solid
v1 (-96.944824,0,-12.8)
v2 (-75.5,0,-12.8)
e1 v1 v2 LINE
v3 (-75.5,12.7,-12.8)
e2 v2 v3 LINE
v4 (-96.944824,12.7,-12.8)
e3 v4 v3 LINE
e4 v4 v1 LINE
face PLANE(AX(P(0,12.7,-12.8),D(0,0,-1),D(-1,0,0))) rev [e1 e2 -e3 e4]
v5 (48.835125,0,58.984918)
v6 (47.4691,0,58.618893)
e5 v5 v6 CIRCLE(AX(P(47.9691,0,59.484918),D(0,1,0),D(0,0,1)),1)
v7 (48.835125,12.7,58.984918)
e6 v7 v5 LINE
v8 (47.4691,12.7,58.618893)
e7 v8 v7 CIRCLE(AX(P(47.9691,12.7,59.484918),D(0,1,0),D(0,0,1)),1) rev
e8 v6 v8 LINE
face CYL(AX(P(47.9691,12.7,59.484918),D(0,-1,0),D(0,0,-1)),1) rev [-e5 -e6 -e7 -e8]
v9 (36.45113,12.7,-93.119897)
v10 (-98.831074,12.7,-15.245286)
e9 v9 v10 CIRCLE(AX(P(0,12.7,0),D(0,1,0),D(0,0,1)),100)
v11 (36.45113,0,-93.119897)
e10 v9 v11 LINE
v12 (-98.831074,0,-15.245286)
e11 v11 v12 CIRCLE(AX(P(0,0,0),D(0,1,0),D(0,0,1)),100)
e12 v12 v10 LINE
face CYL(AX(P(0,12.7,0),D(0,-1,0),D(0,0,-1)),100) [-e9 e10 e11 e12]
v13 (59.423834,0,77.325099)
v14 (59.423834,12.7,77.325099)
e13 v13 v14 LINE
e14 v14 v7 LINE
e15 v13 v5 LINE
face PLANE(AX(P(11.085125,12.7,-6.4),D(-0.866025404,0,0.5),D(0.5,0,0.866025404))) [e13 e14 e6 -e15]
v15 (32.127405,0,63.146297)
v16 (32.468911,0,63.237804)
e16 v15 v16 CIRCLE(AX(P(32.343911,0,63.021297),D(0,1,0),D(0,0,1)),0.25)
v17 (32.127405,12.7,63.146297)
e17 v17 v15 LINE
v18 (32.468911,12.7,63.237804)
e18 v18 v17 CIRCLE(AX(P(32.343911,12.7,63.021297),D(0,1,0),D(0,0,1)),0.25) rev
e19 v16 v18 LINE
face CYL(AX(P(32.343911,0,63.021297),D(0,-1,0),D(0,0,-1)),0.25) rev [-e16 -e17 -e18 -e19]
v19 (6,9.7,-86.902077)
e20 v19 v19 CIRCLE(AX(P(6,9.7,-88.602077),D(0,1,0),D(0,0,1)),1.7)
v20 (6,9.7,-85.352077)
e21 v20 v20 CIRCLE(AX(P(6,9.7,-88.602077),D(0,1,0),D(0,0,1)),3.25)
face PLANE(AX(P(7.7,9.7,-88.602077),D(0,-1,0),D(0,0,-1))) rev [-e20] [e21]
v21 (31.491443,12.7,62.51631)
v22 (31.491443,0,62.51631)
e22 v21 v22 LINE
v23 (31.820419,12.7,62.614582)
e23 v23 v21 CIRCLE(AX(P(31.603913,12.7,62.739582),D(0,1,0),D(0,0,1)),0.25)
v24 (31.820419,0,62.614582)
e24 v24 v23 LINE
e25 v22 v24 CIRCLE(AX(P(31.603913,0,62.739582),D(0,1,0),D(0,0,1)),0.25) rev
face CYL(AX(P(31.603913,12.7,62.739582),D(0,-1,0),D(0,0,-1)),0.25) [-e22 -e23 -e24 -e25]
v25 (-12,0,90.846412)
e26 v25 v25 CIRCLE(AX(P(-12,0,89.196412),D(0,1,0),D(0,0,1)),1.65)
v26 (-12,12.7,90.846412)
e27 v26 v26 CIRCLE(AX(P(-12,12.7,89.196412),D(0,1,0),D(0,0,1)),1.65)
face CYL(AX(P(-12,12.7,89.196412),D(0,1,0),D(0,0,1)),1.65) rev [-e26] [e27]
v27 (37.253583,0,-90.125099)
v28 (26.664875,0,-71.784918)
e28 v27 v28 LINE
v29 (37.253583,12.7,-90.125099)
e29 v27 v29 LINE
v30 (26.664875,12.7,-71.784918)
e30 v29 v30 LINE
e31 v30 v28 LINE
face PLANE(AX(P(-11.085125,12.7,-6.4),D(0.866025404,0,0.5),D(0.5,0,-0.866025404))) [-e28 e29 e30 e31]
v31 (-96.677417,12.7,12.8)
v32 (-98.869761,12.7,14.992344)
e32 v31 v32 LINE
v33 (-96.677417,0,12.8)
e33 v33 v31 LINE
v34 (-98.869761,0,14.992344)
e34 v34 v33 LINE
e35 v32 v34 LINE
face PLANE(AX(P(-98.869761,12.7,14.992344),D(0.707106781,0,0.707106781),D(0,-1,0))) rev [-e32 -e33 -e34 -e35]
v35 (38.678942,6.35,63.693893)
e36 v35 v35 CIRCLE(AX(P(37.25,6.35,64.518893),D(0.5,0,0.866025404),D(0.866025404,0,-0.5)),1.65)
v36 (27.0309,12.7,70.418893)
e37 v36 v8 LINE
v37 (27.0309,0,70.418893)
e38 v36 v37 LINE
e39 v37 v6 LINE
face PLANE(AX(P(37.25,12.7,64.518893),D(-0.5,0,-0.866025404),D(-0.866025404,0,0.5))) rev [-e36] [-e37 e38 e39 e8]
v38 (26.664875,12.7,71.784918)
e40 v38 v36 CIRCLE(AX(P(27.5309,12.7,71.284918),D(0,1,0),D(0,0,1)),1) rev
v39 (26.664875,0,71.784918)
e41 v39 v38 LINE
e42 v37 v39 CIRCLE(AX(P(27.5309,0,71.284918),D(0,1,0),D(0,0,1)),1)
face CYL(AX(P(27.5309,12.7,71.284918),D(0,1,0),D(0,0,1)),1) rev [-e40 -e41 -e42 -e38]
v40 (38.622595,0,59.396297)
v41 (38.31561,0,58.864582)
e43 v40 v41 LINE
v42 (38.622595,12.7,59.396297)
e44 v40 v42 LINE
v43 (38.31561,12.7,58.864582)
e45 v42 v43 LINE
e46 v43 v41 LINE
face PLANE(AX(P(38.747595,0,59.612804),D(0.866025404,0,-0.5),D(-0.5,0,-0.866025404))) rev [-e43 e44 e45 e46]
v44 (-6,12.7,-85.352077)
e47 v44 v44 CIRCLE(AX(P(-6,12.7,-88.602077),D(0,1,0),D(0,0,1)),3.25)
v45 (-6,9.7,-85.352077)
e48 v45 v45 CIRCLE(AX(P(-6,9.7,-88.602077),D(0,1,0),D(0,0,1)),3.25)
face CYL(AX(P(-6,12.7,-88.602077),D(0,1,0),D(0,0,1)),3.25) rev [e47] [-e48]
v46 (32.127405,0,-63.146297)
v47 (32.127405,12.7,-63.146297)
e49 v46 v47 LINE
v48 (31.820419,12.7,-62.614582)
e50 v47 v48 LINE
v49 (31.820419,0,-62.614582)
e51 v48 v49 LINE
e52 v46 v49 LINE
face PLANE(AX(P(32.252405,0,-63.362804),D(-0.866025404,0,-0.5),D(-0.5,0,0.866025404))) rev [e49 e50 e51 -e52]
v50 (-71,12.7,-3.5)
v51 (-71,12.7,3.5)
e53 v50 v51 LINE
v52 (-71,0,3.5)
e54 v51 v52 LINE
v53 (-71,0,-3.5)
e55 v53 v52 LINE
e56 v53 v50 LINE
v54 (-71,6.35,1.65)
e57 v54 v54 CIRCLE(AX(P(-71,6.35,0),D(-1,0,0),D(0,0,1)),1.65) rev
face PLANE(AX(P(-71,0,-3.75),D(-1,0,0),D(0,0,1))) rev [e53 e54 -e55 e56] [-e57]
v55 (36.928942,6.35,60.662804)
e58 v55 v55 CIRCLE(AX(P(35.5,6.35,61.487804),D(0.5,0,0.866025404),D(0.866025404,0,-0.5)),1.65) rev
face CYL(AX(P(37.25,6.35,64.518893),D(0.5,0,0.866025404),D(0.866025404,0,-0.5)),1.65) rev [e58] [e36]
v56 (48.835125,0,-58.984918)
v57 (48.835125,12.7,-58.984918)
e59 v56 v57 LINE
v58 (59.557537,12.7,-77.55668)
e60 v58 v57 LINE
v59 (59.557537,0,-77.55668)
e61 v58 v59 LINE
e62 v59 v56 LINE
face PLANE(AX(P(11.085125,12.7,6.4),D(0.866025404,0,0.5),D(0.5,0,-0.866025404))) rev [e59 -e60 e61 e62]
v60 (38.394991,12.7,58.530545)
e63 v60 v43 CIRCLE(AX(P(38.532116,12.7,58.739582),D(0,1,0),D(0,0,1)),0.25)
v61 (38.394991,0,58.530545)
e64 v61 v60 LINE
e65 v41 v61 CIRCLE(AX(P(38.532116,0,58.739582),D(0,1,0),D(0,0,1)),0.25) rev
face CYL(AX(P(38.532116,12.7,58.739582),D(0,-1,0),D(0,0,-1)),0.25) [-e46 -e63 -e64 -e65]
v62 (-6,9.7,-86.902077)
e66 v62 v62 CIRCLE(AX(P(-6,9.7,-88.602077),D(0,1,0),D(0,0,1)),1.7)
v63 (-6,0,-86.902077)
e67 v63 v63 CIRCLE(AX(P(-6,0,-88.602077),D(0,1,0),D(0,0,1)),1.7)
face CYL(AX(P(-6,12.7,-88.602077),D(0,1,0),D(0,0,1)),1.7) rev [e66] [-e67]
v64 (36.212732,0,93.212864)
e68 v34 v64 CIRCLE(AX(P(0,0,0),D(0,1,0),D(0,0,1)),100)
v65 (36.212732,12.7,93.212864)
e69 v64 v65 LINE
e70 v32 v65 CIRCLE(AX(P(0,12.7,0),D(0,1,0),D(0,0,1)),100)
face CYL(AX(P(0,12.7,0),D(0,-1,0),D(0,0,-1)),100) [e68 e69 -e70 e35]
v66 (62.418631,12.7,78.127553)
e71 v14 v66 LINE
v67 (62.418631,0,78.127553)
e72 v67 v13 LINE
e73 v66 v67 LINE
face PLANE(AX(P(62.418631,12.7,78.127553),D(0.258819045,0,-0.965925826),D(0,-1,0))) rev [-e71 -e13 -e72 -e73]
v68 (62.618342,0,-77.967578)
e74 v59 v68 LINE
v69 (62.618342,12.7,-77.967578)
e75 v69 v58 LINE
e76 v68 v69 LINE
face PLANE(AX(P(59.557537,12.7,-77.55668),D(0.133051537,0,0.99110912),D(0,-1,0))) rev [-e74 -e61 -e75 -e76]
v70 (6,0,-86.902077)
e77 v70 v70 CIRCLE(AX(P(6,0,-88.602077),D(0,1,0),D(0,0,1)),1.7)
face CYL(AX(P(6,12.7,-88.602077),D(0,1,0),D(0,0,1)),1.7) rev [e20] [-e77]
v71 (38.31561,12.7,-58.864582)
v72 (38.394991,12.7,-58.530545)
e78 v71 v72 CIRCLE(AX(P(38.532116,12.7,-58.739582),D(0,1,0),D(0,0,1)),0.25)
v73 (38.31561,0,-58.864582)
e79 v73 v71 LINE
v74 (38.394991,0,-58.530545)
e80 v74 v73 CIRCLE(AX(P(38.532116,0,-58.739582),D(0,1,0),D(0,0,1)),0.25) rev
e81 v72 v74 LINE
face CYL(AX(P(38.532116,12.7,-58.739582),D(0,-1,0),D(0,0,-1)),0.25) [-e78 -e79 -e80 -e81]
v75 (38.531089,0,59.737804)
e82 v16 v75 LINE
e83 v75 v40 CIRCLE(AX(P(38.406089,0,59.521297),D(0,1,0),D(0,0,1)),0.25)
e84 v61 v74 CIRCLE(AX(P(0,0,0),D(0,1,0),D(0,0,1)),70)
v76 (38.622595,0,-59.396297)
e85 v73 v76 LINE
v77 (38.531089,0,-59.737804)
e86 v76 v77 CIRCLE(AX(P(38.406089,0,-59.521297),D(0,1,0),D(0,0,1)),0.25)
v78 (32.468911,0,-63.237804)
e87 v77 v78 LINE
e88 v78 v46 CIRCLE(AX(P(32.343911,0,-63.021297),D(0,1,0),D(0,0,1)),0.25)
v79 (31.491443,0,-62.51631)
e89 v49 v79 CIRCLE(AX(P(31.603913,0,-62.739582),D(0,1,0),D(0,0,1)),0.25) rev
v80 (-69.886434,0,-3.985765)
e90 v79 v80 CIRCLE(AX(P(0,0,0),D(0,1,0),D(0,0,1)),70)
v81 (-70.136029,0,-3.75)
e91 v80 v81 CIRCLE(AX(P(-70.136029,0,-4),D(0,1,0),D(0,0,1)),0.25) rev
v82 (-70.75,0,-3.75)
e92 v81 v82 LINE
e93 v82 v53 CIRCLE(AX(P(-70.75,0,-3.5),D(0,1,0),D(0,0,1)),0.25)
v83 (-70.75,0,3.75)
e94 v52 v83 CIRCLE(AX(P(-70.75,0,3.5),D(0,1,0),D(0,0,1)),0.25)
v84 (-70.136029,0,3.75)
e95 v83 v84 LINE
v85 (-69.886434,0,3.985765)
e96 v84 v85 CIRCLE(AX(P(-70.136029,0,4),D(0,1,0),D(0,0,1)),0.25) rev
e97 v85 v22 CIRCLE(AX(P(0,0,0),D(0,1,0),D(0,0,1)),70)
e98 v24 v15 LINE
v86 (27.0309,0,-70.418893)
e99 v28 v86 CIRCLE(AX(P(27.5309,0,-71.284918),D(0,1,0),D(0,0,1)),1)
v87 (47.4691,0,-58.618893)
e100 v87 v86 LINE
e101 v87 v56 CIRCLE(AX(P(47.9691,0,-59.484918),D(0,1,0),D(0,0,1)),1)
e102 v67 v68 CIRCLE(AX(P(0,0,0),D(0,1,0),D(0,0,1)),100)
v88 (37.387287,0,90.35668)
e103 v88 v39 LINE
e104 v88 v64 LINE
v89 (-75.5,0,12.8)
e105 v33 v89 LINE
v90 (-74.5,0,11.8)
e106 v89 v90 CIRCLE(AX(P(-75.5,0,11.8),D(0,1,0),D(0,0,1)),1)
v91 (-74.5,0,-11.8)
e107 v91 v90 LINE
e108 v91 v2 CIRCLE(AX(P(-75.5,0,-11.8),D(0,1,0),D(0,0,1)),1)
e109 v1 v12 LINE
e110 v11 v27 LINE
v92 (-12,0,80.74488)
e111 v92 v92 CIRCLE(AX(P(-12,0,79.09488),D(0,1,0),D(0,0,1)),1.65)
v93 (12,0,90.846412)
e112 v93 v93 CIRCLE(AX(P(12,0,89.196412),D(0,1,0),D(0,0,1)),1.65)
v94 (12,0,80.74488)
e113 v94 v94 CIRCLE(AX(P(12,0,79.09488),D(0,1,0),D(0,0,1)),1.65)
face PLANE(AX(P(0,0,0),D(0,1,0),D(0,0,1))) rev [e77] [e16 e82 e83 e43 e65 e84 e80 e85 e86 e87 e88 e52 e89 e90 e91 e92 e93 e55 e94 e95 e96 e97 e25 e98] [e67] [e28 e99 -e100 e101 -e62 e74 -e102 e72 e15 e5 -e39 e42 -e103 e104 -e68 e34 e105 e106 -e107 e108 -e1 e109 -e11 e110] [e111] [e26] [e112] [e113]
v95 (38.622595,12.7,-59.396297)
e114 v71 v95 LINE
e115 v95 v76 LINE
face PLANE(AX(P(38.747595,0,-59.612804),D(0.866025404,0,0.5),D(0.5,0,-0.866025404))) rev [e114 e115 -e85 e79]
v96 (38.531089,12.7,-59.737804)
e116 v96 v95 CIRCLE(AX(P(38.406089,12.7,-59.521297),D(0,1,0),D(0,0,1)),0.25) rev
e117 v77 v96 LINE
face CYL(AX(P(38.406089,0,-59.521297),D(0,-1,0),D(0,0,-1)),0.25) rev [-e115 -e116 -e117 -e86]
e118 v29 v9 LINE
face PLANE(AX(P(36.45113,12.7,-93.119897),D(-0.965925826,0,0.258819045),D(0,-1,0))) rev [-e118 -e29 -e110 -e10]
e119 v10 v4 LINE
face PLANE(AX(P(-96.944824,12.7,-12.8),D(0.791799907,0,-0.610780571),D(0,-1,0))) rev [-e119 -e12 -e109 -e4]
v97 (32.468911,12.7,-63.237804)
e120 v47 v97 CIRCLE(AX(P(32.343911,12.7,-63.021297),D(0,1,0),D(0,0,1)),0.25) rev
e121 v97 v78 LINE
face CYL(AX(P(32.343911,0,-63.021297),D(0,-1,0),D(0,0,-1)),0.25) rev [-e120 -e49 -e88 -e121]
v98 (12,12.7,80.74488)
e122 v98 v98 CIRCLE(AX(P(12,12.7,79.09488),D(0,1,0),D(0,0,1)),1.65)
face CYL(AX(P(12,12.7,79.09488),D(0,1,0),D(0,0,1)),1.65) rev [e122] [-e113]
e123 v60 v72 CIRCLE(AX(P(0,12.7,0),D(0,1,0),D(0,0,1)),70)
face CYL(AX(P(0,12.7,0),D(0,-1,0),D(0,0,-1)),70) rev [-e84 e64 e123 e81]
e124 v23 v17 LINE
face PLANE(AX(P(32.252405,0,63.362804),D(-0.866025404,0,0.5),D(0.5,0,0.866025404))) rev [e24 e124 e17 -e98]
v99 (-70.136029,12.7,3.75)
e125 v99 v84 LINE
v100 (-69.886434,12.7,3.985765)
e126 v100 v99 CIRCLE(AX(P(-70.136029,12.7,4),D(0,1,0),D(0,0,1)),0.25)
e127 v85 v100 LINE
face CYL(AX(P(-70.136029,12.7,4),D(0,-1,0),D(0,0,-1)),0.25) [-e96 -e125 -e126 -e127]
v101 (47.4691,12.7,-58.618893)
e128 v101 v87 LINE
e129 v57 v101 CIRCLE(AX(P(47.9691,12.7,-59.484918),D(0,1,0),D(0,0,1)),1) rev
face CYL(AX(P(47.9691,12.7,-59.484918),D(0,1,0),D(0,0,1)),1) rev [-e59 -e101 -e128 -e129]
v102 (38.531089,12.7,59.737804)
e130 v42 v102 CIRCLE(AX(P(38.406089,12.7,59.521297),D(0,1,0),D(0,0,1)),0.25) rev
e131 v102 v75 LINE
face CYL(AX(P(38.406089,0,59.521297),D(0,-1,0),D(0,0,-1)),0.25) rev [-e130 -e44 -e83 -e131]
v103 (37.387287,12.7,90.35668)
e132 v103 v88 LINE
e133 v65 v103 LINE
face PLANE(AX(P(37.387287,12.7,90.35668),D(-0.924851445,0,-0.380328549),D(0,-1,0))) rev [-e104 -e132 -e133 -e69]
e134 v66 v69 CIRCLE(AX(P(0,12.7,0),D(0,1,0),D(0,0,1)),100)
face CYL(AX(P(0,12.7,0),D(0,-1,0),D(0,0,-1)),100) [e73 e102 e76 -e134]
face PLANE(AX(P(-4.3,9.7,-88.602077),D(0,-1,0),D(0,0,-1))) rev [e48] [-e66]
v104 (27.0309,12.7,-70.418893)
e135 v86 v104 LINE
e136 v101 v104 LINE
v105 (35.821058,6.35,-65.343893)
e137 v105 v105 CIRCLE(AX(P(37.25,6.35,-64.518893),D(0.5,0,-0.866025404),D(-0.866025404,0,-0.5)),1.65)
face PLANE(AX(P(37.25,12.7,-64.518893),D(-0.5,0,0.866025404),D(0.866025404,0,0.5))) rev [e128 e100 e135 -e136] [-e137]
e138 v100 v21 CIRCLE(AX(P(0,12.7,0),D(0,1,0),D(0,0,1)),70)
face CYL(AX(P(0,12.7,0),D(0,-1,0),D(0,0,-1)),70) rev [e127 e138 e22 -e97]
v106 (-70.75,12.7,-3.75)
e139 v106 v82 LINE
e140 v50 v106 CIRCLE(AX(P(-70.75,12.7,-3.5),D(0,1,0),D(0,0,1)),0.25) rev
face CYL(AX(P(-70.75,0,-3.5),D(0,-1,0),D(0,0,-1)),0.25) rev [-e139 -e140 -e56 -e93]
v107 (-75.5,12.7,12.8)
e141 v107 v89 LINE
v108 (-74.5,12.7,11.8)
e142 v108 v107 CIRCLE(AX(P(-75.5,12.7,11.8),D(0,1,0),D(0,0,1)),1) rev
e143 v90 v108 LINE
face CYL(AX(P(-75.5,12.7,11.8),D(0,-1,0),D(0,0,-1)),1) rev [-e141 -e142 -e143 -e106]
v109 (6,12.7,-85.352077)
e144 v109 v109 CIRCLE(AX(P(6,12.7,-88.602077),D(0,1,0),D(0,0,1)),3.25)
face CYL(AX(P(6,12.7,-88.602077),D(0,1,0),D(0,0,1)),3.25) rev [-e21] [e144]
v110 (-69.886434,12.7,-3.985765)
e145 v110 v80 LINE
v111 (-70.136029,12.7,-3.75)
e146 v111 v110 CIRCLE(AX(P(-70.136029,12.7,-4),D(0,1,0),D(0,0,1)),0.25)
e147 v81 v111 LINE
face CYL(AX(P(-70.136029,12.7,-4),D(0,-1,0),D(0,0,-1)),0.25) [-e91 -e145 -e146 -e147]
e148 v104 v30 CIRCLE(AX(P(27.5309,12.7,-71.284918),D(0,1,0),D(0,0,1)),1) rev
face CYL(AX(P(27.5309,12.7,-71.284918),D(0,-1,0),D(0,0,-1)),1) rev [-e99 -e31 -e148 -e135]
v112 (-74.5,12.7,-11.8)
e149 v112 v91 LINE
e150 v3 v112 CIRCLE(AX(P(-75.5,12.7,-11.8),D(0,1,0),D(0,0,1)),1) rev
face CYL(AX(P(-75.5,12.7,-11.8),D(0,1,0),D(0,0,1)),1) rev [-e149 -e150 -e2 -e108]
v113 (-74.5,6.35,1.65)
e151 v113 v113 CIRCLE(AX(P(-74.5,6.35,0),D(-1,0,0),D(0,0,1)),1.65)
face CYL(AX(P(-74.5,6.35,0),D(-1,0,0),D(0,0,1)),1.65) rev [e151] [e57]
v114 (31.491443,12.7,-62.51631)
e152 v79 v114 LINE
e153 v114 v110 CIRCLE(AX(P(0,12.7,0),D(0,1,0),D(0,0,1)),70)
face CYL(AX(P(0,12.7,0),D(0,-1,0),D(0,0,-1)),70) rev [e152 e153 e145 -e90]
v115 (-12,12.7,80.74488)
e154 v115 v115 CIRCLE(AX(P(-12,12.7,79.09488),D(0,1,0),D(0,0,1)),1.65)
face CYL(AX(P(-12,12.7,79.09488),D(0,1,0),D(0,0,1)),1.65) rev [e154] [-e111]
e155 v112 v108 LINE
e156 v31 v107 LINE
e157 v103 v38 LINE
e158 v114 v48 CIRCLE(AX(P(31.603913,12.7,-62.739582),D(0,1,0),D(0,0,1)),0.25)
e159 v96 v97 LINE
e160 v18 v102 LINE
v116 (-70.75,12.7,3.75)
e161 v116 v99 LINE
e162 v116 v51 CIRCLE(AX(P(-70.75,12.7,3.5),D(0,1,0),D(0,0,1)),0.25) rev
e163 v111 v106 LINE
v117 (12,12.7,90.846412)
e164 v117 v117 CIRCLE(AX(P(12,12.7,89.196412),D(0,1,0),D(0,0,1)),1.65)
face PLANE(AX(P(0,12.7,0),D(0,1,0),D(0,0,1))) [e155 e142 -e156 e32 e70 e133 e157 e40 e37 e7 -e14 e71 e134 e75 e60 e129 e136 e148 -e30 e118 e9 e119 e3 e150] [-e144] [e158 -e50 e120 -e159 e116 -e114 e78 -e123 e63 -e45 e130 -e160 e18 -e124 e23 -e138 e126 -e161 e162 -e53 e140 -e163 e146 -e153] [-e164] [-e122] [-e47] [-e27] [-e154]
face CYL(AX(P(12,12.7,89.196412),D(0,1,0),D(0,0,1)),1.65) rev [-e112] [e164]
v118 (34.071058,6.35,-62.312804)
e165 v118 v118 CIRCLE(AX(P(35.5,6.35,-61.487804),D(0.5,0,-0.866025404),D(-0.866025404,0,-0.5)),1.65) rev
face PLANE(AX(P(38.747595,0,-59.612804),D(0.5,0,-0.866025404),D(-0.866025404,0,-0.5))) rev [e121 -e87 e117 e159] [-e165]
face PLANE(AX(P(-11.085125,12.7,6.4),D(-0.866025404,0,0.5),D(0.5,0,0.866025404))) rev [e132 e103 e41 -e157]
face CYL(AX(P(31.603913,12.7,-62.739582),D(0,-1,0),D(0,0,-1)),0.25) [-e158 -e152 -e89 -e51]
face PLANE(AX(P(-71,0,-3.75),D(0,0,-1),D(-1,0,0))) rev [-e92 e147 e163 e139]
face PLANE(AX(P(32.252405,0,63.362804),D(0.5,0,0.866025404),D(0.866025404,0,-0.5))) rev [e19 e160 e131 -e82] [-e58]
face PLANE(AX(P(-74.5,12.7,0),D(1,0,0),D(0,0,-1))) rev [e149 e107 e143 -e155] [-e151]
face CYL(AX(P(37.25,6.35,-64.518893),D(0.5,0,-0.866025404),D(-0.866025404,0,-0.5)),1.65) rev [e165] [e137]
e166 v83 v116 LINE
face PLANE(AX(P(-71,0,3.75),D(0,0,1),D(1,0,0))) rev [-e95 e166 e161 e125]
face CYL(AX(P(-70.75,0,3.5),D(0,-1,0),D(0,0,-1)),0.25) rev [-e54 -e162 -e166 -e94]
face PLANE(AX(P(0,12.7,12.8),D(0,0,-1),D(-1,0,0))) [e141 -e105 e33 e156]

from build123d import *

# Parameters (mm, degrees)
SKETCH1_R                      = 70
BOSS_EXTRUDE2_DEPTH            = 12.7
FILLET1_R                      = 1
CHAMFER1_SIZE                  = 2.232593028
CHAMFER1_SIZE_2                = 2.5
F_3_0MM_DOWEL_HOLE2_REACH      = 215.907
F_3_0MM_DOWEL_HOLE2_BORE_R     = 1.65
CIRPATTERN3_COUNT              = 3
SKETCH8_W                      = 2
SKETCH8_H                      = 7.5
CUT_EXTRUDE1_DEPTH             = 142.990457435
FILLET2_R                      = 0.25
CIRPATTERN4_COUNT              = 3
FILLET2_OF_CIRPATTERN4_R       = 0.25
CBORE_FOR_M3_SHCS1_D           = 3.4
CBORE_FOR_M3_SHCS1_DEPTH       = 25.25
CBORE_FOR_M3_SHCS1_CBORE_D     = 6.5
CBORE_FOR_M3_SHCS1_CBORE_DEPTH = 3
CBORE_FOR_M3_SHCS1_TIP         = 1.021463052
F_3_0MM_DOWEL_HOLE3_D          = 3.3
F_3_0MM_DOWEL_HOLE3_DEPTH      = 45
F_3_0MM_DOWEL_HOLE3_TIP        = 0.991420021


with BuildPart() as part:
    # Sketch1 → Boss-Extrude2 (new body)
    with BuildSketch(Plane(origin=(0, 0, 0), x_dir=(1, 0, 0), z_dir=(0, 1, 0))):
        with BuildLine():
            ThreePointArc((100, 0), (89.630863423, 44.343075243), (60.673833561, 79.490162417))
            Line((60.673833561, 79.490162417), (48.335125168, 58.118892582))
            Line((48.335125168, 58.118892582), (26.164874832, 70.918892582))
            Line((26.164874832, 70.918892582), (38.503583224, 92.290162417))
            ThreePointArc((38.503583224, 92.290162417), (-50, 86.602540378), (-99.177416784, 12.8))
            Line((-99.177416784, 12.8), (-74.5, 12.8))
            Line((-74.5, 12.8), (-74.5, -12.8))
            Line((-74.5, -12.8), (-99.177416784, -12.8))
            ThreePointArc((-99.177416784, -12.8), (-50, -86.602540378), (38.503583224, -92.290162417))
            Line((38.503583224, -92.290162417), (26.164874832, -70.918892582))
            Line((26.164874832, -70.918892582), (48.335125168, -58.118892582))
            Line((48.335125168, -58.118892582), (60.673833561, -79.490162417))
            ThreePointArc((60.673833561, -79.490162417), (89.630863423, -44.343075243), (100, 0))
        make_face()
        with Locations(Location((0, 0, 0), (0, 0, 270))):
            Circle(SKETCH1_R, mode=Mode.SUBTRACT)
    extrude(amount=BOSS_EXTRUDE2_DEPTH)

    # Fillet1
    fillet1_edges = [part.edges().sort_by_distance(p)[0] for p in [
        (48.335125168, 6.35, 58.118892582),
        (26.164874832, 6.35, 70.918892582),
        (-74.5, 6.35, 12.8),
        (-74.5, 6.35, -12.8),
        (26.164874832, 6.35, -70.918892582),
        (48.335125168, 6.35, -58.118892582),
    ]]
    fillet(fillet1_edges, radius=FILLET1_R)

    # Chamfer1
    # the kernel refuses this chamfer: 2.5, 2.232593028 mm, written as the material it takes off along each edge
    with BuildSketch(Plane(origin=(38.503583224, -6.351330223, 92.290162417), x_dir=(-0.4999999999994457, 0, -0.8660254037847587), z_dir=(0, 1, 0)), Plane(origin=(60.673833561, -6.351330223, -79.490162417), x_dir=(-0.5000000000003051, 0, 0.8660254037842624), z_dir=(0, 1, 0))) as chamfer1_piece_1:
        with BuildLine():
            Line((CHAMFER1_SIZE, 0), (0.346342416, 2.445285803))
            ThreePointArc((0.346342416, 2.445285803), (0.170523224, 1.258272567), (0, 0))
            Line((0, 0), (CHAMFER1_SIZE, 0))
        make_face()
    extrude(amount=25.402660447, mode=Mode.SUBTRACT)
    with BuildSketch(Plane(origin=(-99.177416784, -6.42920747, 12.8), x_dir=(0.13897023449143497, 0, 0.990296558574953), z_dir=(0, 1, 0)), Plane(origin=(60.673833561, -6.42920747, 79.490162417), x_dir=(0.7881368597604604, 0, -0.6155000327269856), z_dir=(0, 1, 0))) as chamfer1_piece_2:
        with BuildLine():
            Line((2.213825834, 0), (CHAMFER1_SIZE_2 * 0.138970234491, CHAMFER1_SIZE_2 * 0.990296558575))
            Line((CHAMFER1_SIZE_2 * 0.138970234491, CHAMFER1_SIZE_2 * 0.990296558575), (0, 0))
            ThreePointArc((0, 0), (1.137001677, -0.006121942), (2.213825834, 0))
        make_face()
    extrude(amount=25.55841494, mode=Mode.SUBTRACT)
    with BuildSketch(Plane(origin=(-99.177416784, -6.351330223, -12.8), x_dir=(0.1402371214073107, 0, -0.9901179474079799), z_dir=(0, 1, 0))) as chamfer1_piece_3:
        with BuildLine():
            Line((2.469691423, 0), (CHAMFER1_SIZE * 0.140237121404, -CHAMFER1_SIZE * 0.990117947384))
            Line((CHAMFER1_SIZE * 0.140237121404, -CHAMFER1_SIZE * 0.990117947384), (0, 0))
            ThreePointArc((0, 0), (1.269751938, 0.007618418), (2.469691423, 0))
        make_face()
    extrude(amount=25.402660447, mode=Mode.SUBTRACT)
    with BuildSketch(Plane(origin=(38.503583224, -6.42920747, -92.290162417), x_dir=(-0.49999999999948913, 0, 0.8660254037847336), z_dir=(0, 1, 0))) as chamfer1_piece_4:
        with BuildLine():
            Line((CHAMFER1_SIZE_2, 0), (0.307655895, -2.192344105))
            ThreePointArc((0.307655895, -2.192344105), (0.151946852, -1.126819615), (0, 0))
            Line((0, 0), (CHAMFER1_SIZE_2, 0))
        make_face()
    extrude(amount=25.55841494, mode=Mode.SUBTRACT)

    # Ø3.0mm Dowel Hole2 bore → Ø3.0mm Dowel Hole2 (cut, up to next)
    with BuildSketch(Plane(origin=(37.25, 0, 64.518892582), x_dir=(0.8660254037844382, 0, -0.500000000000001), z_dir=(0.5000000000000009, 0, 0.866025403784438)), mode=Mode.PRIVATE) as f_3_0mm_dowel_hole2_sk1:
        with Locations((0, 6.35)):
            Circle(F_3_0MM_DOWEL_HOLE2_BORE_R)
    f_3_0mm_dowel_hole2_tool1 = extrude(f_3_0mm_dowel_hole2_sk1.sketch, amount=-F_3_0MM_DOWEL_HOLE2_REACH, mode=Mode.PRIVATE) & part.part
    f_3_0mm_dowel_hole2 = f_3_0mm_dowel_hole2_tool1.solids().sort_by_distance((37.25, 6.35, 64.518893))[0]
    add(f_3_0mm_dowel_hole2, mode=Mode.SUBTRACT)

    # CirPattern3: Ø3.0mm Dowel Hole2 ×3 about axis
    cirpattern3_axis = Axis((0, 12.7, 0), (0, -1, 0))
    for i in range(1, CIRPATTERN3_COUNT):
        add(f_3_0mm_dowel_hole2.rotate(cirpattern3_axis, i * 360 / CIRPATTERN3_COUNT), mode=Mode.SUBTRACT)

    # Sketch8 → Cut-Extrude1 (cut, through all)
    with BuildSketch(Plane(origin=(0, 12.7, 0), x_dir=(1, 0, 0), z_dir=(0, 1, 0))):
        with Locations((-70, 0)):
            Rectangle(SKETCH8_W, SKETCH8_H)
    cut_extrude1 = extrude(amount=-CUT_EXTRUDE1_DEPTH, mode=Mode.SUBTRACT)

    # Fillet2
    fillet2_edges = [part.edges().sort_by_distance(p)[0] for p in [
        (-69.8994814, 6.35, 3.75),
        (-69.8994814, 6.35, -3.75),
        (-71, 6.35, 3.75),
        (-71, 6.35, -3.75),
    ]]
    fillet(fillet2_edges, radius=FILLET2_R)

    # CirPattern4: Cut-Extrude1 ×3 about axis
    cirpattern4_axis = Axis((0, 0, 0), (0, 1, 0))
    for i in range(1, CIRPATTERN4_COUNT):
        add(cut_extrude1.rotate(cirpattern4_axis, i * 360 / CIRPATTERN4_COUNT), mode=Mode.SUBTRACT)

    # Fillet2 of CirPattern4
    fillet2_of_cirpattern4_edges = [part.edges().sort_by_distance(p)[0] for p in [
        (38.197335964, 6.35, 58.659726604),
        (31.702145436, 6.35, 62.409726604),
        (38.747595264, 6.35, 59.612803669),
        (32.252404736, 6.35, 63.362803669),
        (31.702145436, 6.35, -62.409726604),
        (38.197335964, 6.35, -58.659726604),
        (32.252404736, 6.35, -63.362803669),
        (38.747595264, 6.35, -59.612803669),
    ]]
    fillet(fillet2_of_cirpattern4_edges, radius=FILLET2_OF_CIRPATTERN4_R)

    # CBORE for M3 SHCS1
    with Locations(Plane(origin=(0, 12.7, 0), x_dir=(1, 0, 0), z_dir=(0, 1, 0))):
        with Locations((6, 88.602076866), (-6, 88.602076866)):
            CounterBoreHole(CBORE_FOR_M3_SHCS1_D / 2, CBORE_FOR_M3_SHCS1_CBORE_D / 2, CBORE_FOR_M3_SHCS1_CBORE_DEPTH, depth=CBORE_FOR_M3_SHCS1_DEPTH)
            with Locations((0, 0, -(CBORE_FOR_M3_SHCS1_DEPTH + CBORE_FOR_M3_SHCS1_TIP / 2))):  # 118° drill point
                Cone(0, CBORE_FOR_M3_SHCS1_D / 2, CBORE_FOR_M3_SHCS1_TIP, mode=Mode.SUBTRACT)

    # Ø3.0mm Dowel Hole3
    with Locations(Plane(origin=(0, 12.7, 0), x_dir=(1, 0, 0), z_dir=(0, 1, 0))):
        with Locations((12, -79.094879733), (12, -89.196412484), (-12, -89.196412484), (-12, -79.094879733)):
            Hole(F_3_0MM_DOWEL_HOLE3_D / 2, depth=F_3_0MM_DOWEL_HOLE3_DEPTH)
            with Locations((0, 0, -(F_3_0MM_DOWEL_HOLE3_DEPTH + F_3_0MM_DOWEL_HOLE3_TIP / 2))):  # 118° drill point
                Cone(0, F_3_0MM_DOWEL_HOLE3_D / 2, F_3_0MM_DOWEL_HOLE3_TIP, mode=Mode.SUBTRACT)


solid = part.part
